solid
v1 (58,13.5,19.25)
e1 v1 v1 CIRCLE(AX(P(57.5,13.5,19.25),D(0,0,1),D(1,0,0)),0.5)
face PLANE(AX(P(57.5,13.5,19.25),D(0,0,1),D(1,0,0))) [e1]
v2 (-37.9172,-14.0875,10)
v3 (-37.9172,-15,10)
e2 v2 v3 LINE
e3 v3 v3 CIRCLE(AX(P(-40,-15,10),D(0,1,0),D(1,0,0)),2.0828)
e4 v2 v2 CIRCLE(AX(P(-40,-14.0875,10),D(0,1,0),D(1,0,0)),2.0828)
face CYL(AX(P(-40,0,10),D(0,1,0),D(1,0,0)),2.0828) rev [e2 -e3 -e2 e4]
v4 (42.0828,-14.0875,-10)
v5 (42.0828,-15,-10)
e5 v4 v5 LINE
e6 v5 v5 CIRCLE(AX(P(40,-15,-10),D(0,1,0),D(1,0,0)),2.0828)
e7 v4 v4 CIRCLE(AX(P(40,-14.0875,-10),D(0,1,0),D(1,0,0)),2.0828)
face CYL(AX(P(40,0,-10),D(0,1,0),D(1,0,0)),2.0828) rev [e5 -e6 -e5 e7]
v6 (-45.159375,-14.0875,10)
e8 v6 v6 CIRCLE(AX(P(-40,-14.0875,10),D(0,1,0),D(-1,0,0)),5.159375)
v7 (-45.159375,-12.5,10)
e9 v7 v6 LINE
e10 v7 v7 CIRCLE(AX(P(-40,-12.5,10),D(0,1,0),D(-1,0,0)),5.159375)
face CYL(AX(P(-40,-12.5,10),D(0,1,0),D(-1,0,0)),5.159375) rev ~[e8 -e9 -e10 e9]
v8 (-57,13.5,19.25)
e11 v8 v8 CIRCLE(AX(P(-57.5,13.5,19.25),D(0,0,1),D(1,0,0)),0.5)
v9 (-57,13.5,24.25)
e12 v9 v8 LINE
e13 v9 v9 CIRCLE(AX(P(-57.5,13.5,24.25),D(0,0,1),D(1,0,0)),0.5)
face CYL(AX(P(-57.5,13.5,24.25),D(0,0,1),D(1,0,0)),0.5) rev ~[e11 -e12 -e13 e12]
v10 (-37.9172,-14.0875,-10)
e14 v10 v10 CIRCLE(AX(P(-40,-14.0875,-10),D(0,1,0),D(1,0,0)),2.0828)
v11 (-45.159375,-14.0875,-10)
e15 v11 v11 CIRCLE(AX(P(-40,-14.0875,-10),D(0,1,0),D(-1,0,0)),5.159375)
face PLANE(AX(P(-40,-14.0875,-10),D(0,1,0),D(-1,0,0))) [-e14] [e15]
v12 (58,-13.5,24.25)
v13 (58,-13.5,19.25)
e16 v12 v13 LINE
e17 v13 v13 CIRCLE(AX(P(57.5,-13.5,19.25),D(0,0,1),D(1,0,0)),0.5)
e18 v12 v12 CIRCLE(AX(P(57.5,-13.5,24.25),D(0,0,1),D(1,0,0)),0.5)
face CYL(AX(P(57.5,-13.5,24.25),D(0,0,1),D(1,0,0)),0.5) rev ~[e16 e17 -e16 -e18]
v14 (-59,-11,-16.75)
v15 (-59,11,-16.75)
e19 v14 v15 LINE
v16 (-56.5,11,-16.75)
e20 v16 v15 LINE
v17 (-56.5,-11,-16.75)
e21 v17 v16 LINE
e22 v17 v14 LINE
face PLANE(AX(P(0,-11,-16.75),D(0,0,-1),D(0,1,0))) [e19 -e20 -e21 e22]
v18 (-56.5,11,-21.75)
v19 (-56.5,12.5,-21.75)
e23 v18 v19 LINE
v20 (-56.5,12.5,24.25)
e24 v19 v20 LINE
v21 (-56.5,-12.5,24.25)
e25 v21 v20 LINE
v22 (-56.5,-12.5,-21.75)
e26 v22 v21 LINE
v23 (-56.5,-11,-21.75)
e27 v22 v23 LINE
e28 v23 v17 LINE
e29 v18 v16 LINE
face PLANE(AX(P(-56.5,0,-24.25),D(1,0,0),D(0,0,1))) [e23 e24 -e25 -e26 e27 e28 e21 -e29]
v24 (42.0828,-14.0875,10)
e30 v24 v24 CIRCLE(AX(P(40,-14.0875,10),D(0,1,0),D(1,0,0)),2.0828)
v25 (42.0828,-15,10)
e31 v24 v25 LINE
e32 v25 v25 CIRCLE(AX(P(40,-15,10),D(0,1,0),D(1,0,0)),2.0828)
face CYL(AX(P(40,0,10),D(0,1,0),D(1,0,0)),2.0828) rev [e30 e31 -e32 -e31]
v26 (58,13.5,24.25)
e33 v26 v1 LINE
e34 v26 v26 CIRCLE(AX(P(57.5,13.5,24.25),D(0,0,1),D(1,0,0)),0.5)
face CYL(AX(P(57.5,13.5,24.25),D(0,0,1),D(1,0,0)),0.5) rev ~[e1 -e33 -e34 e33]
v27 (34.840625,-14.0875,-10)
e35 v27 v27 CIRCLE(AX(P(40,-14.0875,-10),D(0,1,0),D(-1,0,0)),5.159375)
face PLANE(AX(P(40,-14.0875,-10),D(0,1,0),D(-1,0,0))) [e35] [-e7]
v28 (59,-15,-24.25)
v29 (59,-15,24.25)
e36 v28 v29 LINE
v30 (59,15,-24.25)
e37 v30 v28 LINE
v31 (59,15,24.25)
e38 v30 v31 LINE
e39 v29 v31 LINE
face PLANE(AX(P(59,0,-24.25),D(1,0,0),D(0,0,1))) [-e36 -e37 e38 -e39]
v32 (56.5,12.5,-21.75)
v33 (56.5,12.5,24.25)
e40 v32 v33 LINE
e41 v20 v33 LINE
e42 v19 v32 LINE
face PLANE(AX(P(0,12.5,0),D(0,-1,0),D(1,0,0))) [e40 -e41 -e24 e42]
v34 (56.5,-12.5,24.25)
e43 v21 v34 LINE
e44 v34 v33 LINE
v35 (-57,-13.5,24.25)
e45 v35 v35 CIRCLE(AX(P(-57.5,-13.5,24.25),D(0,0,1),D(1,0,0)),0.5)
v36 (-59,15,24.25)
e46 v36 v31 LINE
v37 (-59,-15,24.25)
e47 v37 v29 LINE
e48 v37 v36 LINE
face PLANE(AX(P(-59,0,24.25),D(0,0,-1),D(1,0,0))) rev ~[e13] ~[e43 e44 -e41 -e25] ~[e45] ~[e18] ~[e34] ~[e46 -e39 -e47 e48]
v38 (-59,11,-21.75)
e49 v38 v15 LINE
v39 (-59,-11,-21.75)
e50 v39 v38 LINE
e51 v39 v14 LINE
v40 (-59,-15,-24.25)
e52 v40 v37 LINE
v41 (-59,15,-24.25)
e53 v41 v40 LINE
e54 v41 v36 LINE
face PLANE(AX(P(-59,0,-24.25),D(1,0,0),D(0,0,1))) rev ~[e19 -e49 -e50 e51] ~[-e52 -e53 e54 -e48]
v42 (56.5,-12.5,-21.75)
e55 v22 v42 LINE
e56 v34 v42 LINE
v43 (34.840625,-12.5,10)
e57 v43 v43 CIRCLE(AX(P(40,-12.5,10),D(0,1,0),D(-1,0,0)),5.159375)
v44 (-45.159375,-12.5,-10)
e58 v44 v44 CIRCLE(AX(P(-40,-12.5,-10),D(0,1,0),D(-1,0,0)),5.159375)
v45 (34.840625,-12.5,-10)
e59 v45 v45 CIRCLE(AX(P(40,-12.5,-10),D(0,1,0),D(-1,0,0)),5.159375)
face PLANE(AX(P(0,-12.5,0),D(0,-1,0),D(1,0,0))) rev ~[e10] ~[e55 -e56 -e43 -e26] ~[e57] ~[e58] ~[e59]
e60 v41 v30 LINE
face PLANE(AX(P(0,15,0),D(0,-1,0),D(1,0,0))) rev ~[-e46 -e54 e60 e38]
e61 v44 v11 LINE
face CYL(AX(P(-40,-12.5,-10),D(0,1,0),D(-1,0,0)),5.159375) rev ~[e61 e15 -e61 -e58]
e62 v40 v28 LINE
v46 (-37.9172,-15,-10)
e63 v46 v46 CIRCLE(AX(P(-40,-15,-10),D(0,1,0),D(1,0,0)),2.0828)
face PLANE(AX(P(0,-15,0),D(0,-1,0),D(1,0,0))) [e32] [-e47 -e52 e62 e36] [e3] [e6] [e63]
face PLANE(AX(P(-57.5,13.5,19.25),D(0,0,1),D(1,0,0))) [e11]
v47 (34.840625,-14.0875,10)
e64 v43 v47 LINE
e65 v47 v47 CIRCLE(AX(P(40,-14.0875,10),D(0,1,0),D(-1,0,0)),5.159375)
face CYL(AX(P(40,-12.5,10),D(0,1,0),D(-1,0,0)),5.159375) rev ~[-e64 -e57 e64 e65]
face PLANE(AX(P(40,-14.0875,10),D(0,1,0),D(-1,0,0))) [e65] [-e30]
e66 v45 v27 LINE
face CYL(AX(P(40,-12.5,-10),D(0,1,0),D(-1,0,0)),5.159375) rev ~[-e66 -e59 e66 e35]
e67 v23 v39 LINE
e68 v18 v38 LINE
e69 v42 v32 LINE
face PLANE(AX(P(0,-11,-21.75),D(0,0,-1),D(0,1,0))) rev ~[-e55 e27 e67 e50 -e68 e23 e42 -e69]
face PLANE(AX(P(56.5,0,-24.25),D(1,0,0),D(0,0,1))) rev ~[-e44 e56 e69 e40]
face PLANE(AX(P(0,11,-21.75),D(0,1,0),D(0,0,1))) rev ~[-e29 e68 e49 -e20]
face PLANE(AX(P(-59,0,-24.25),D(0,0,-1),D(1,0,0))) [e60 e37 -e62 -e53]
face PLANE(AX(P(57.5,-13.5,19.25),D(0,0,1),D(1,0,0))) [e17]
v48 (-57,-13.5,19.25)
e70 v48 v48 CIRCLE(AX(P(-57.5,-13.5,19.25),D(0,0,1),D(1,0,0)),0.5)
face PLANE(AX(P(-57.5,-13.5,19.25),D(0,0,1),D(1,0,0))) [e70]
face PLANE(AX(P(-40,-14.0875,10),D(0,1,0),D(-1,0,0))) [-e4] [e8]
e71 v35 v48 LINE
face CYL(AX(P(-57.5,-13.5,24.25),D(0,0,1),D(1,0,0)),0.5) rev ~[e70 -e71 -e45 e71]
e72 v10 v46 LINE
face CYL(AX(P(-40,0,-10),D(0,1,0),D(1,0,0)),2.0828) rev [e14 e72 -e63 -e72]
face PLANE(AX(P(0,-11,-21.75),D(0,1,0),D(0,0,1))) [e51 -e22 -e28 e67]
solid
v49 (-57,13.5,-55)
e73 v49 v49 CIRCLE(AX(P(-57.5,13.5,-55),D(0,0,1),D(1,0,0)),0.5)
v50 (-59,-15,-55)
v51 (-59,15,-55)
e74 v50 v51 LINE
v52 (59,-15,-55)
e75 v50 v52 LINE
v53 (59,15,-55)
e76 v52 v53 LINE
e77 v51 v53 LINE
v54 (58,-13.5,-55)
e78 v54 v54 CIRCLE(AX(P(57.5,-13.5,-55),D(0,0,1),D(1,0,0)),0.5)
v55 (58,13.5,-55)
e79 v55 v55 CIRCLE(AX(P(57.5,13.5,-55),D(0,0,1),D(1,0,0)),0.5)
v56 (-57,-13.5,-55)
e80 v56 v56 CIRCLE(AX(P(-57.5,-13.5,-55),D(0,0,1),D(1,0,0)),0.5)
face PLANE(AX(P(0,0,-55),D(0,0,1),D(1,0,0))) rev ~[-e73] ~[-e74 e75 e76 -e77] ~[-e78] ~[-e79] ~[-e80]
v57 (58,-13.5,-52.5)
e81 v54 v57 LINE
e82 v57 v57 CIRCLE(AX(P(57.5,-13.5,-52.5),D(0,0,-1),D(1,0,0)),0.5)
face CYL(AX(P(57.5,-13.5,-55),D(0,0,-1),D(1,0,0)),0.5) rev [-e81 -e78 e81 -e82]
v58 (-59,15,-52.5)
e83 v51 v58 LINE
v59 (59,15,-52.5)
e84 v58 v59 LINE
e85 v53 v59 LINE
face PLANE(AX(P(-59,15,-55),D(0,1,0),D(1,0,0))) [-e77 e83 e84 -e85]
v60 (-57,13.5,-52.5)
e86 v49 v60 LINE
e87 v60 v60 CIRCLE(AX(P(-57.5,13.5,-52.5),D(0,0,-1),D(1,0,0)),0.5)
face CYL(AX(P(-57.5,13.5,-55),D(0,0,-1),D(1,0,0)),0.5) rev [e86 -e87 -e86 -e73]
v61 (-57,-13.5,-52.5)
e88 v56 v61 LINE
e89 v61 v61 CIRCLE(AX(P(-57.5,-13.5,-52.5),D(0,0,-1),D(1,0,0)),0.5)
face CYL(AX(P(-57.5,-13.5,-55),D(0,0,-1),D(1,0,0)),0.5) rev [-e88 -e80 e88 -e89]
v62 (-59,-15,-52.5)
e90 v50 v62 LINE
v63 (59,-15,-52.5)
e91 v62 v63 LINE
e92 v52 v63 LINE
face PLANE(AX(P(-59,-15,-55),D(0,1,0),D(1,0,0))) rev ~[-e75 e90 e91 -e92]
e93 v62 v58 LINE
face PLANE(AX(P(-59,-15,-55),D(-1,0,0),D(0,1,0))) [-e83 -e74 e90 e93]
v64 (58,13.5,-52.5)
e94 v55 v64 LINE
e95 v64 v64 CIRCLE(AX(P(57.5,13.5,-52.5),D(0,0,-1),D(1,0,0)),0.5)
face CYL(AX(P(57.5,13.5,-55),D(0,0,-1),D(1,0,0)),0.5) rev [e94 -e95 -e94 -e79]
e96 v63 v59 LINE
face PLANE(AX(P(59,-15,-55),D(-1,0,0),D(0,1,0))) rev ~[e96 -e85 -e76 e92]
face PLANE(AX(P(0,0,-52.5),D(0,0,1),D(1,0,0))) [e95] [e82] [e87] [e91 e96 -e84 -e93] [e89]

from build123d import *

# Parameters (mm, degrees)
F0_W      = 118
F0_H      = 48.5
F1_DEPTH  = 15
F2_T      = -2.5
F3_W      = 22
F3_H      = 5
F4_DEPTH  = 59.4
F5_R      = 2.0828
F6_DEPTH  = 25
F8_W      = 118
F8_H      = 30
F9_DEPTH  = 2.5
F10_R     = 0.5
F11_DEPTH = 55
F12_R     = 0.5
F13_DEPTH = 5
F14_R     = 5.159375
F15_DEPTH = 1.5875


# Not quite as in the source:
# - a length typed as a fraction of an inch, garbled in the dataset ("3 / 203.2 mm" for 3/8 in), is restored


with BuildPart() as f1:
    # F0 (on Front) → F1 (new body, symmetric)
    with BuildSketch(Plane.XZ):
        Rectangle(F0_W, F0_H)
    extrude(amount=F1_DEPTH, both=True)

    # F2
    f2_openings = [f1.faces().sort_by_distance(p)[0] for p in [
        (0, 0, 24.25),
    ]]
    offset(amount=F2_T, openings=f2_openings)

    # F3 (on Right) → F4 (cut)
    with BuildSketch(Plane.YZ):
        with Locations((0, -19.25)):
            Rectangle(F3_W, F3_H)
    extrude(amount=-F4_DEPTH, mode=Mode.SUBTRACT)

    # F5 (on Front) → F6 (cut)
    with BuildSketch(Plane.XZ):
        with Locations((40, -10)):
            Circle(F5_R)
        with Locations((-40, -10)):
            Circle(F5_R)
        with Locations((-40, 10)):
            Circle(F5_R)
        with Locations((40, 10)):
            Circle(F5_R)
    extrude(amount=F6_DEPTH, mode=Mode.SUBTRACT)

    # F12 (on face) → F13 (cut)
    with BuildSketch(Plane.XY.offset(24.25)):
        with Locations((-57.5, 13.5)):
            Circle(F12_R)
        with Locations((-57.5, -13.5)):
            Circle(F12_R)
        with Locations((57.5, -13.5)):
            Circle(F12_R)
        with Locations((57.5, 13.5)):
            Circle(F12_R)
    extrude(amount=-F13_DEPTH, mode=Mode.SUBTRACT)

    # F14 (on face) → F15 (cut)
    with BuildSketch(Plane(origin=(0, -12.5, 0), x_dir=(-1, 0, 0), z_dir=(0, 1, 0))):
        with Locations((40, -10)):
            Circle(F14_R)
        with Locations((40, 10)):
            Circle(F14_R)
        with Locations((-40, 10)):
            Circle(F14_R)
        with Locations((-40, -10)):
            Circle(F14_R)
    extrude(amount=-F15_DEPTH, mode=Mode.SUBTRACT)


with BuildPart() as f9:
    # F8 (on offset) → F9 (new body)
    with BuildSketch(Plane.XY.offset(-55)):
        Rectangle(F8_W, F8_H)
    extrude(amount=F9_DEPTH)

    # F10 (on offset) → F11 (cut)
    with BuildSketch(Plane.XY.offset(-55)):
        with Locations((-57.5, 13.5)):
            Circle(F10_R)
        with Locations((-57.5, -13.5)):
            Circle(F10_R)
        with Locations((57.5, -13.5)):
            Circle(F10_R)
        with Locations((57.5, 13.5)):
            Circle(F10_R)
    extrude(amount=F11_DEPTH, mode=Mode.SUBTRACT)


solid = Compound([f1.part, f9.part])
